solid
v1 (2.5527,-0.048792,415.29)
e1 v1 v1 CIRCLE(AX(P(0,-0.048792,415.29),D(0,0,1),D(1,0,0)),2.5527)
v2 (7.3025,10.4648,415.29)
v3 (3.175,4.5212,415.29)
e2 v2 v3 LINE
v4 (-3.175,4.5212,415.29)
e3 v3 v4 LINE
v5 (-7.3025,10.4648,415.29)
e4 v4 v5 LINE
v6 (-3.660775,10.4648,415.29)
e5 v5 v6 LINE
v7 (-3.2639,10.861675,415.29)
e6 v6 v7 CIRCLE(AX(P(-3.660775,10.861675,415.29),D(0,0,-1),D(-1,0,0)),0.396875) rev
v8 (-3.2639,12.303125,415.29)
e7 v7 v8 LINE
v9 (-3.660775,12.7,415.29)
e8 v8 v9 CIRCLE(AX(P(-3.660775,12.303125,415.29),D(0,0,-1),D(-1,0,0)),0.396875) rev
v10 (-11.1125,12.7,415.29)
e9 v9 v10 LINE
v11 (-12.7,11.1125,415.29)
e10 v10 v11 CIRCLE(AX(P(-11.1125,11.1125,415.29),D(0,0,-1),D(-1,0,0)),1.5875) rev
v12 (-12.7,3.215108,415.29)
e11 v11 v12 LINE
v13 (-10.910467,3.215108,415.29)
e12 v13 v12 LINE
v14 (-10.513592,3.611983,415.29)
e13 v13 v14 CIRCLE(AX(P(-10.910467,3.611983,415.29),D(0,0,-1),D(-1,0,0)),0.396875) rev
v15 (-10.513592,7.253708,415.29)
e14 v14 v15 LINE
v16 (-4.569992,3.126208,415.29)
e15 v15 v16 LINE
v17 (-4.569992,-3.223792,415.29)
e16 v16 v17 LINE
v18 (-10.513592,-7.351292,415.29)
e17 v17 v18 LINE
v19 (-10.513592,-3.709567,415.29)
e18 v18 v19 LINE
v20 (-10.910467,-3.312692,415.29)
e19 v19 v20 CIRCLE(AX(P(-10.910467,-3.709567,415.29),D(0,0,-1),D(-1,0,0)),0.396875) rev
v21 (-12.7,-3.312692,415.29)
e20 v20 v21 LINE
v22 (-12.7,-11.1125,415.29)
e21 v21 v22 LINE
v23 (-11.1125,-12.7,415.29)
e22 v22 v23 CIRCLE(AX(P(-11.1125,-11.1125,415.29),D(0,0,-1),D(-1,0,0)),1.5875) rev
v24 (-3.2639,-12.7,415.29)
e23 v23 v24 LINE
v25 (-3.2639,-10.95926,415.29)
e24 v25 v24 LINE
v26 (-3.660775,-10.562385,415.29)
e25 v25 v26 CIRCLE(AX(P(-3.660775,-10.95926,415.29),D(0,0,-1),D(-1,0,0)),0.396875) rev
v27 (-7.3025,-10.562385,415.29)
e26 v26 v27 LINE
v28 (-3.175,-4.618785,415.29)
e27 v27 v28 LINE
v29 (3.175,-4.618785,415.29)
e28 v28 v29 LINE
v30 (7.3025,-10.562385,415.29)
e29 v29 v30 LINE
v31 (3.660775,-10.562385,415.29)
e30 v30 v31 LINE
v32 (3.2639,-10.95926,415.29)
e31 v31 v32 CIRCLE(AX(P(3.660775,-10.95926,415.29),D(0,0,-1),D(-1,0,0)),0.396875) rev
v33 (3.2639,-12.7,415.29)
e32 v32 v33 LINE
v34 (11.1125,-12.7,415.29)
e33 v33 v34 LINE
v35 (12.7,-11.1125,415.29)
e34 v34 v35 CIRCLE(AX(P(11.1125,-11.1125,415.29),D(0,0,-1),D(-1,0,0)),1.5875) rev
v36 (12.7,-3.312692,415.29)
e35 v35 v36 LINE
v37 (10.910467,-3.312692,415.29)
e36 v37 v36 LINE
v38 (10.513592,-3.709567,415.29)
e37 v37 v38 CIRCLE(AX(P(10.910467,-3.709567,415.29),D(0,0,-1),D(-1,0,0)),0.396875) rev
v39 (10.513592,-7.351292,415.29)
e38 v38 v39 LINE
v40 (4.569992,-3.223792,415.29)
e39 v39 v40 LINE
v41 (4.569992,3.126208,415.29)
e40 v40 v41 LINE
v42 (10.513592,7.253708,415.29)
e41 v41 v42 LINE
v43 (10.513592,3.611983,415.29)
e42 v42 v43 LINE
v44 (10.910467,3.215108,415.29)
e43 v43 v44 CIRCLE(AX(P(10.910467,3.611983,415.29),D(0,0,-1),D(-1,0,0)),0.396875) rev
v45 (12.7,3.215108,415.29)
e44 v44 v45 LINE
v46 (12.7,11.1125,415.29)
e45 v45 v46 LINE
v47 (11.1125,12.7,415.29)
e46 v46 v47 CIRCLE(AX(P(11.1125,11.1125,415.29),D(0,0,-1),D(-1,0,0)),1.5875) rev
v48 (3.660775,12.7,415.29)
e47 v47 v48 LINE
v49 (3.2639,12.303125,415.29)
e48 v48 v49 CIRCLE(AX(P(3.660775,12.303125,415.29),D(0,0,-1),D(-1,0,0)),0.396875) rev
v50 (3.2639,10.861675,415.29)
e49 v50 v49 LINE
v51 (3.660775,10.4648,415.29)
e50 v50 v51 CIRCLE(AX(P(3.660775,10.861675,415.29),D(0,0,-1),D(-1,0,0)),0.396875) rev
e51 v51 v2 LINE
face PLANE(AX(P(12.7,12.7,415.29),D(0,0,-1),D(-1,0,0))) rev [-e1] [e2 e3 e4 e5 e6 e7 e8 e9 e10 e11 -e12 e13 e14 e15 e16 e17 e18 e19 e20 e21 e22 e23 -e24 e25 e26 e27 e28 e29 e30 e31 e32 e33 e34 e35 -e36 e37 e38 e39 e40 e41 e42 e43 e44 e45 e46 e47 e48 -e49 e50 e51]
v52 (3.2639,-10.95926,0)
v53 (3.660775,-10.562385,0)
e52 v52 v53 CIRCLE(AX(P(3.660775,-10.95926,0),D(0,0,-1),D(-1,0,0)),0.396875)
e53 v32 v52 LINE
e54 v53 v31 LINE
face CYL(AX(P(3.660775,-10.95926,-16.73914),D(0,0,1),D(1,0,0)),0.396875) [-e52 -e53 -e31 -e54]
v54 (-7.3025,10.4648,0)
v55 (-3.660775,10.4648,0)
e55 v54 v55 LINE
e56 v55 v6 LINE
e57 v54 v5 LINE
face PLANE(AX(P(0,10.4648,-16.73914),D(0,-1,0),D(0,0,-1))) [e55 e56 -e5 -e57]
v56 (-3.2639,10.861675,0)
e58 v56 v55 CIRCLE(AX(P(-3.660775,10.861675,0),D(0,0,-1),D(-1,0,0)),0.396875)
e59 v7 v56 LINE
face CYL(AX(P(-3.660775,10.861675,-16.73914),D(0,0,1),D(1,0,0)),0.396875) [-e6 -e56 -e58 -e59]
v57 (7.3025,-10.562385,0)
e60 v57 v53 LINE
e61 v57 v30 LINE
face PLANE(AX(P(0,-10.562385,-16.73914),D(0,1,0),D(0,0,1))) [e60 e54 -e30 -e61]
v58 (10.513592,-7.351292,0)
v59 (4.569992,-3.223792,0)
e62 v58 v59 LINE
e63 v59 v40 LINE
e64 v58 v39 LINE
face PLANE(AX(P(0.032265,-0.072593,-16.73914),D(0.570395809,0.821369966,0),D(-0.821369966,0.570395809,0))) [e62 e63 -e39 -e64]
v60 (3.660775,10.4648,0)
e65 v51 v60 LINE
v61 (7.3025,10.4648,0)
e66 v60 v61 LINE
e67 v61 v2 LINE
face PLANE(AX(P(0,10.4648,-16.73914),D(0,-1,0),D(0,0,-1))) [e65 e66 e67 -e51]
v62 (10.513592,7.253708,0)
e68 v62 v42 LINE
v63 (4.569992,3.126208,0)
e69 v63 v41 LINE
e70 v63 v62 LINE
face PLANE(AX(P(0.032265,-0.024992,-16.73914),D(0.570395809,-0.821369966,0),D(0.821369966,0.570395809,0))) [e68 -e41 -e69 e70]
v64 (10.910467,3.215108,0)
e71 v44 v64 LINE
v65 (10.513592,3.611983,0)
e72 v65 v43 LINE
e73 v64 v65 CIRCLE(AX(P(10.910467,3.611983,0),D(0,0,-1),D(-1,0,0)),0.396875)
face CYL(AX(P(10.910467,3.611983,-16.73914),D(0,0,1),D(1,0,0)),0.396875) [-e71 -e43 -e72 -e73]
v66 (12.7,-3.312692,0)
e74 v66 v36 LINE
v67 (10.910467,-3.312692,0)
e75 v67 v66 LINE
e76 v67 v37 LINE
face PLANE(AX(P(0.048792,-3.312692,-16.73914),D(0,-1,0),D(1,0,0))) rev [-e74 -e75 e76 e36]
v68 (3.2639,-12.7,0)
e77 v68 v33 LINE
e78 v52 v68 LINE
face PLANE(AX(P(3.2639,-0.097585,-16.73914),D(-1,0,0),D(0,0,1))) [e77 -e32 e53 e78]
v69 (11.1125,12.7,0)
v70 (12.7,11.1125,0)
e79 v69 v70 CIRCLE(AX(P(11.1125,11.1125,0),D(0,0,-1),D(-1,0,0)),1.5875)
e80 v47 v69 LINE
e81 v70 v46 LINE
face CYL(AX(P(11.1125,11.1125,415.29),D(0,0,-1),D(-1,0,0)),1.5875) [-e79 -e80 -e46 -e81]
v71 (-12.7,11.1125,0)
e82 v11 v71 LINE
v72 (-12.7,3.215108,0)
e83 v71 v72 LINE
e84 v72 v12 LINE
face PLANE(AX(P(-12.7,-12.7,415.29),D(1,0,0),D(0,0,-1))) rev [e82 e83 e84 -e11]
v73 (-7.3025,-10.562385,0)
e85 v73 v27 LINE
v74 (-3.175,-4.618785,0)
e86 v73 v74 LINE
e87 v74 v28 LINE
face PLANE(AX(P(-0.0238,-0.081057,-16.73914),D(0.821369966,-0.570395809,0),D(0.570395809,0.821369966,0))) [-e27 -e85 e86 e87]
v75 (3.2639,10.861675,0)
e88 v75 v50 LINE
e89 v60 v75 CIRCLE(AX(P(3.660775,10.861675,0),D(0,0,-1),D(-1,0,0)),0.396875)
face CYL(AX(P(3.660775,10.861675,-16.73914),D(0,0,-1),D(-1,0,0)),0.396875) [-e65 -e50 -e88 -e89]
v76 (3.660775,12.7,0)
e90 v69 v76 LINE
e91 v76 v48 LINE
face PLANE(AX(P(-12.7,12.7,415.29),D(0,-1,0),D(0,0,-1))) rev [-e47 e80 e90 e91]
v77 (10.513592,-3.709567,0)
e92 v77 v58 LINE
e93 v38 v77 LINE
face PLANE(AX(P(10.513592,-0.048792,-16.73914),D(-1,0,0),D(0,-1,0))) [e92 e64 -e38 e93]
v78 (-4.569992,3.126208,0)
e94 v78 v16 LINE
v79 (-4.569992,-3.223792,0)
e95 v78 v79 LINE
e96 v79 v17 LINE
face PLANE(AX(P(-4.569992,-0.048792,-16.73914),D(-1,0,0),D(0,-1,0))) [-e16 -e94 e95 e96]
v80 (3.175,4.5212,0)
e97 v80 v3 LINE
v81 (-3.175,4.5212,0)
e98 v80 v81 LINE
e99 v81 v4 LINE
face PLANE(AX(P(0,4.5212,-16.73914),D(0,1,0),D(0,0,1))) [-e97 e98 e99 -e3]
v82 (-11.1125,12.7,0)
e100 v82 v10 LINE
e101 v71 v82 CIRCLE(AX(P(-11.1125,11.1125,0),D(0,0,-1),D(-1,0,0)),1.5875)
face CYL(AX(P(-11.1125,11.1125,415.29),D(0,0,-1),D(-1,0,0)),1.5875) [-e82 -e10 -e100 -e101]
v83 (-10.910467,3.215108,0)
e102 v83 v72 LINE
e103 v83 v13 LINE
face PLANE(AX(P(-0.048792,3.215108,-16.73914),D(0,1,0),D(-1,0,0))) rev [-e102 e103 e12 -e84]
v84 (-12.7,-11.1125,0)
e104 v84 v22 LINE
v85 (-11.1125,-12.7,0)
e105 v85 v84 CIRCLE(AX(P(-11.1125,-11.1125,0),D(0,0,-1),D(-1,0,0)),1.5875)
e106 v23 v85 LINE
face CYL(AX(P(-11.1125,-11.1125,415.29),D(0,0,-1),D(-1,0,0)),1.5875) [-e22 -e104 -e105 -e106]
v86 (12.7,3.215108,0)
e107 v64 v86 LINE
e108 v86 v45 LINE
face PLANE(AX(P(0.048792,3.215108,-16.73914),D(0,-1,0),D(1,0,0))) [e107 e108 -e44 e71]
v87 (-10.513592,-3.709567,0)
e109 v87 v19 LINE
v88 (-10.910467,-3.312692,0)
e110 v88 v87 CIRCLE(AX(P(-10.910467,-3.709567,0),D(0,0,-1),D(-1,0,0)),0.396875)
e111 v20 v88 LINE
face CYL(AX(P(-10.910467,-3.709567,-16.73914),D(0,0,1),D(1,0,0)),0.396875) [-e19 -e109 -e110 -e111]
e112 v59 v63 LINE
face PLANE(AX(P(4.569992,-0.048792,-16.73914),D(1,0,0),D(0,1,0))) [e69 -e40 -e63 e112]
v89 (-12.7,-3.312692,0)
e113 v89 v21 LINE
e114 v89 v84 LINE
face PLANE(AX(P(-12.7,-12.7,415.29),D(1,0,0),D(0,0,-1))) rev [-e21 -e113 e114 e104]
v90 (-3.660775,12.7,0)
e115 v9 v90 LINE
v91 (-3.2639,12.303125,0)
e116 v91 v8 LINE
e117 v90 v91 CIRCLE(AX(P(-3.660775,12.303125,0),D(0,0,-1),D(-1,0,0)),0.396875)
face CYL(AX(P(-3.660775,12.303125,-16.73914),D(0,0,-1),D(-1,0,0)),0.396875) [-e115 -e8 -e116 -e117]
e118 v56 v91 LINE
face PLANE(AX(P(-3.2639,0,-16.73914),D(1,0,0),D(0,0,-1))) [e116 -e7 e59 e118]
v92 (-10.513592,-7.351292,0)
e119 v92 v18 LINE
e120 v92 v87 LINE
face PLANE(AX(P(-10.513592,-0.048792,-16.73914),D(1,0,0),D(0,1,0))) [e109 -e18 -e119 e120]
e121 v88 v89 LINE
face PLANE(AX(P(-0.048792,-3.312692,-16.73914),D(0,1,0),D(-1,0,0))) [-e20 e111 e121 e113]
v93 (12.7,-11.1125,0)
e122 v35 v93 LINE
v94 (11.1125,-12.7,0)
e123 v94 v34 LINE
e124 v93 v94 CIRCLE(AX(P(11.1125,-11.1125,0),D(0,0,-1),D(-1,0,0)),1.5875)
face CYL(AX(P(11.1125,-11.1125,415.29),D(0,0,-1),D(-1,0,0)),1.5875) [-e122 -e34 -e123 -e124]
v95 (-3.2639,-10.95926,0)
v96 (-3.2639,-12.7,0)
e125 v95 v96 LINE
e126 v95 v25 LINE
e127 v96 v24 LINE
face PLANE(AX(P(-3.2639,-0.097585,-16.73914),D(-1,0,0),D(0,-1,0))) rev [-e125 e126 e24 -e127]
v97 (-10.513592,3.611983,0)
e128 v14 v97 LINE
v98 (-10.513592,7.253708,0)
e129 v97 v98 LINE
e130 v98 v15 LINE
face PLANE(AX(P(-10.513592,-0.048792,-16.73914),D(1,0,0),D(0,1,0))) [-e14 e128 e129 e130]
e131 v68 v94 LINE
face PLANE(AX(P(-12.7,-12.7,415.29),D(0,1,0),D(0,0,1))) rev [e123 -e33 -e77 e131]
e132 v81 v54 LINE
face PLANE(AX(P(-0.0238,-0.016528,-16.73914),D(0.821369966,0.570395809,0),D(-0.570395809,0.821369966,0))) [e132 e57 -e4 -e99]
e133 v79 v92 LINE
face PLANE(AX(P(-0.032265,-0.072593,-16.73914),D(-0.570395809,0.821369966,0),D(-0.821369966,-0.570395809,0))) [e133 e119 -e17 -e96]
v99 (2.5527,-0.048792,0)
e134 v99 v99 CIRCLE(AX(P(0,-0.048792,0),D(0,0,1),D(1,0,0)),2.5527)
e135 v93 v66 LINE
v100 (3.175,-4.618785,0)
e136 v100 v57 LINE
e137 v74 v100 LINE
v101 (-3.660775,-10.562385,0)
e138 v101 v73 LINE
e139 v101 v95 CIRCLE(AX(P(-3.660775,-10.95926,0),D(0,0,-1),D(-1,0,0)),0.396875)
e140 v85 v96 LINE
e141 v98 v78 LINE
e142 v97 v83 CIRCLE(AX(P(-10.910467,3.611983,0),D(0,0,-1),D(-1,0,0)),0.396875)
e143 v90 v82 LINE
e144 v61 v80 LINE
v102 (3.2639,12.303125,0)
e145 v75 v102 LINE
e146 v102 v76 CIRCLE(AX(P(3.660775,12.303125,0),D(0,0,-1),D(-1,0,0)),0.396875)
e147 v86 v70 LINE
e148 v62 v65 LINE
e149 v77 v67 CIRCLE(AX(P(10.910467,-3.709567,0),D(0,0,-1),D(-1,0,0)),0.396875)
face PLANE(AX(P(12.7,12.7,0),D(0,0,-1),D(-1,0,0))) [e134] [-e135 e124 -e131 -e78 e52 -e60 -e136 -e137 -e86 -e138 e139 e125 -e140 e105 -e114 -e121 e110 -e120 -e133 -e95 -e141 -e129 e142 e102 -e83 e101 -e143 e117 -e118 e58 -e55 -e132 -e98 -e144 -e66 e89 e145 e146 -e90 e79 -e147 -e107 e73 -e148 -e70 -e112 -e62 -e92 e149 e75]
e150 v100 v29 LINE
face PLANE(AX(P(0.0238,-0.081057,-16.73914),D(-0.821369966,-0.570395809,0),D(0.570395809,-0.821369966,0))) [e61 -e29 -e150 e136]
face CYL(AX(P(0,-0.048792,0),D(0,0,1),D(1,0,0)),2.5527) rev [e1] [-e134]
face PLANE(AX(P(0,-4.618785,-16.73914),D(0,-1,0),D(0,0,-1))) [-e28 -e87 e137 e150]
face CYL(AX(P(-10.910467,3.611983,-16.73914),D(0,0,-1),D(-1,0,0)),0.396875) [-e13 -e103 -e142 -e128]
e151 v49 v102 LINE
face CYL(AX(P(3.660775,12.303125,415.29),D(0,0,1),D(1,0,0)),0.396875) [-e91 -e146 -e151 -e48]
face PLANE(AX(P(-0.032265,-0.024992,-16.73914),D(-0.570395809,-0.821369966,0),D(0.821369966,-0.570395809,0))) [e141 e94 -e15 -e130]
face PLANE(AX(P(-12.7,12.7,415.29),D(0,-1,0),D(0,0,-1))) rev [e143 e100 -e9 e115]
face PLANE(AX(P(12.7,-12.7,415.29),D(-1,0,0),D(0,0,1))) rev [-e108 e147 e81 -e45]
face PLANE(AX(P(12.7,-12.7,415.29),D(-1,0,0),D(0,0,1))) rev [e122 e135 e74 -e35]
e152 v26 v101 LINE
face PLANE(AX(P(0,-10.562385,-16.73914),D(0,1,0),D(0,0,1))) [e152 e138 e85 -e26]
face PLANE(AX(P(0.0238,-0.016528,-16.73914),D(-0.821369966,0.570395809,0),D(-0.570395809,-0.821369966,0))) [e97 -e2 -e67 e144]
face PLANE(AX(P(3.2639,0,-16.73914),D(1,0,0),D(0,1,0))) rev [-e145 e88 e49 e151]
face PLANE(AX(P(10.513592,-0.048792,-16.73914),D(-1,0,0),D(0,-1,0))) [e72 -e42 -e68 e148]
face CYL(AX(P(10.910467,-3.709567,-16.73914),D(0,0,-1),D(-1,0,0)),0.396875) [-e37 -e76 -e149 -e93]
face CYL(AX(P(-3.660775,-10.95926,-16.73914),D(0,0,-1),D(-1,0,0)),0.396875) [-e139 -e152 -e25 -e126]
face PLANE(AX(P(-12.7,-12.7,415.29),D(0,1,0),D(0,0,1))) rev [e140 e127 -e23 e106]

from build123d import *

# Parameters (mm, degrees)
SKETCH1_W           = 25.4
SKETCH1_H           = 25.4
BOSS_EXTRUDE1_DEPTH = 415.29
FILLET1_R           = 1.5875
HOLE1_OUTLINE_R     = 2.5527
HOLE1_DEPTH         = 415.29
SKETCH7_W           = 6.5278
SKETCH7_H           = 2.2352
CUT_EXTRUDE2_DEPTH  = 415.29
FILLET4_R           = 0.396875
CIRPATTERN2_DEPTH   = 415.29


# Read off the part's stored shape, not the designer's step: Hole1, CirPattern2
with BuildPart() as part:
    # Sketch1 → Boss-Extrude1 (new body)
    with BuildSketch(Plane.XY):
        Rectangle(SKETCH1_W, SKETCH1_H)
    extrude(amount=BOSS_EXTRUDE1_DEPTH)

    # Fillet1
    fillet1_edges = [part.edges().sort_by_distance(p)[0] for p in [
        (12.7, -12.7, 207.645),
        (-12.7, -12.7, 207.645),
        (-12.7, 12.7, 207.645),
        (12.7, 12.7, 207.645),
    ]]
    fillet(fillet1_edges, radius=FILLET1_R)

    # Hole1 outline → Hole1 (cut)
    with BuildSketch(Plane.XY):
        with Locations((0, -0.048792482)):
            Circle(HOLE1_OUTLINE_R)
    extrude(amount=HOLE1_DEPTH, mode=Mode.SUBTRACT)

    # Sketch7 → Cut-Extrude2 (cut)
    with BuildSketch(Plane.XY.offset(415.29)):
        with Locations((0, 11.5824)):
            Rectangle(SKETCH7_W, SKETCH7_H)
        Polygon((-3.175, 4.5212), (-7.3025, 10.4648), (7.3025, 10.4648), (3.175, 4.5212), align=None)
    extrude(amount=-CUT_EXTRUDE2_DEPTH, mode=Mode.SUBTRACT)

    # Fillet4
    fillet4_edges = [part.edges().sort_by_distance(p)[0] for p in [
        (-3.2639, 10.4648, 207.645),
        (-3.2639, 12.7, 207.645),
        (3.2639, 12.7, 207.645),
        (3.2639, 10.4648, 207.645),
    ]]
    fillet(fillet4_edges, radius=FILLET4_R)

    # CirPattern2 outline → CirPattern2 (cut)
    with BuildSketch(Plane.XY):
        with BuildLine():
            ThreePointArc((-3.660775, -10.562384964), (-3.380141996, -10.67862696), (-3.2639, -10.959259964))
            Line((-3.2639, -10.959259964), (-3.2639, -12.7))
            Line((-3.2639, -12.7), (3.2639, -12.7))
            Line((3.2639, -12.7), (3.2639, -10.959259964))
            ThreePointArc((3.2639, -10.959259964), (3.380141996, -10.67862696), (3.660775, -10.562384964))
            Line((3.660775, -10.562384964), (7.3025, -10.562384964))
            Line((7.3025, -10.562384964), (3.175, -4.618784964))
            Line((3.175, -4.618784964), (-3.175, -4.618784964))
            Line((-3.175, -4.618784964), (-7.3025, -10.562384964))
            Line((-7.3025, -10.562384964), (-3.660775, -10.562384964))
        make_face()
        with BuildLine():
            Line((-12.7, -3.312692482), (-10.910467482, -3.312692482))
            ThreePointArc((-10.910467482, -3.312692482), (-10.629834478, -3.428934478), (-10.513592482, -3.709567482))
            Line((-10.513592482, -3.709567482), (-10.513592482, -7.351292482))
            Line((-10.513592482, -7.351292482), (-4.569992482, -3.223792482))
            Line((-4.569992482, -3.223792482), (-4.569992482, 3.126207518))
            Line((-4.569992482, 3.126207518), (-10.513592482, 7.253707518))
            Line((-10.513592482, 7.253707518), (-10.513592482, 3.611982518))
            ThreePointArc((-10.513592482, 3.611982518), (-10.629834478, 3.331349514), (-10.910467482, 3.215107518))
            Line((-10.910467482, 3.215107518), (-12.7, 3.215107518))
            Line((-12.7, 3.215107518), (-12.7, -3.312692482))
        make_face()
        with BuildLine():
            ThreePointArc((10.513592482, -3.709567482), (10.629834478, -3.428934478), (10.910467482, -3.312692482))
            Line((10.910467482, -3.312692482), (12.7, -3.312692482))
            Line((12.7, -3.312692482), (12.7, 3.215107518))
            Line((12.7, 3.215107518), (10.910467482, 3.215107518))
            ThreePointArc((10.910467482, 3.215107518), (10.629834478, 3.331349514), (10.513592482, 3.611982518))
            Line((10.513592482, 3.611982518), (10.513592482, 7.253707518))
            Line((10.513592482, 7.253707518), (4.569992482, 3.126207518))
            Line((4.569992482, 3.126207518), (4.569992482, -3.223792482))
            Line((4.569992482, -3.223792482), (10.513592482, -7.351292482))
            Line((10.513592482, -7.351292482), (10.513592482, -3.709567482))
        make_face()
    extrude(amount=CIRPATTERN2_DEPTH, mode=Mode.SUBTRACT)


solid = part.part
